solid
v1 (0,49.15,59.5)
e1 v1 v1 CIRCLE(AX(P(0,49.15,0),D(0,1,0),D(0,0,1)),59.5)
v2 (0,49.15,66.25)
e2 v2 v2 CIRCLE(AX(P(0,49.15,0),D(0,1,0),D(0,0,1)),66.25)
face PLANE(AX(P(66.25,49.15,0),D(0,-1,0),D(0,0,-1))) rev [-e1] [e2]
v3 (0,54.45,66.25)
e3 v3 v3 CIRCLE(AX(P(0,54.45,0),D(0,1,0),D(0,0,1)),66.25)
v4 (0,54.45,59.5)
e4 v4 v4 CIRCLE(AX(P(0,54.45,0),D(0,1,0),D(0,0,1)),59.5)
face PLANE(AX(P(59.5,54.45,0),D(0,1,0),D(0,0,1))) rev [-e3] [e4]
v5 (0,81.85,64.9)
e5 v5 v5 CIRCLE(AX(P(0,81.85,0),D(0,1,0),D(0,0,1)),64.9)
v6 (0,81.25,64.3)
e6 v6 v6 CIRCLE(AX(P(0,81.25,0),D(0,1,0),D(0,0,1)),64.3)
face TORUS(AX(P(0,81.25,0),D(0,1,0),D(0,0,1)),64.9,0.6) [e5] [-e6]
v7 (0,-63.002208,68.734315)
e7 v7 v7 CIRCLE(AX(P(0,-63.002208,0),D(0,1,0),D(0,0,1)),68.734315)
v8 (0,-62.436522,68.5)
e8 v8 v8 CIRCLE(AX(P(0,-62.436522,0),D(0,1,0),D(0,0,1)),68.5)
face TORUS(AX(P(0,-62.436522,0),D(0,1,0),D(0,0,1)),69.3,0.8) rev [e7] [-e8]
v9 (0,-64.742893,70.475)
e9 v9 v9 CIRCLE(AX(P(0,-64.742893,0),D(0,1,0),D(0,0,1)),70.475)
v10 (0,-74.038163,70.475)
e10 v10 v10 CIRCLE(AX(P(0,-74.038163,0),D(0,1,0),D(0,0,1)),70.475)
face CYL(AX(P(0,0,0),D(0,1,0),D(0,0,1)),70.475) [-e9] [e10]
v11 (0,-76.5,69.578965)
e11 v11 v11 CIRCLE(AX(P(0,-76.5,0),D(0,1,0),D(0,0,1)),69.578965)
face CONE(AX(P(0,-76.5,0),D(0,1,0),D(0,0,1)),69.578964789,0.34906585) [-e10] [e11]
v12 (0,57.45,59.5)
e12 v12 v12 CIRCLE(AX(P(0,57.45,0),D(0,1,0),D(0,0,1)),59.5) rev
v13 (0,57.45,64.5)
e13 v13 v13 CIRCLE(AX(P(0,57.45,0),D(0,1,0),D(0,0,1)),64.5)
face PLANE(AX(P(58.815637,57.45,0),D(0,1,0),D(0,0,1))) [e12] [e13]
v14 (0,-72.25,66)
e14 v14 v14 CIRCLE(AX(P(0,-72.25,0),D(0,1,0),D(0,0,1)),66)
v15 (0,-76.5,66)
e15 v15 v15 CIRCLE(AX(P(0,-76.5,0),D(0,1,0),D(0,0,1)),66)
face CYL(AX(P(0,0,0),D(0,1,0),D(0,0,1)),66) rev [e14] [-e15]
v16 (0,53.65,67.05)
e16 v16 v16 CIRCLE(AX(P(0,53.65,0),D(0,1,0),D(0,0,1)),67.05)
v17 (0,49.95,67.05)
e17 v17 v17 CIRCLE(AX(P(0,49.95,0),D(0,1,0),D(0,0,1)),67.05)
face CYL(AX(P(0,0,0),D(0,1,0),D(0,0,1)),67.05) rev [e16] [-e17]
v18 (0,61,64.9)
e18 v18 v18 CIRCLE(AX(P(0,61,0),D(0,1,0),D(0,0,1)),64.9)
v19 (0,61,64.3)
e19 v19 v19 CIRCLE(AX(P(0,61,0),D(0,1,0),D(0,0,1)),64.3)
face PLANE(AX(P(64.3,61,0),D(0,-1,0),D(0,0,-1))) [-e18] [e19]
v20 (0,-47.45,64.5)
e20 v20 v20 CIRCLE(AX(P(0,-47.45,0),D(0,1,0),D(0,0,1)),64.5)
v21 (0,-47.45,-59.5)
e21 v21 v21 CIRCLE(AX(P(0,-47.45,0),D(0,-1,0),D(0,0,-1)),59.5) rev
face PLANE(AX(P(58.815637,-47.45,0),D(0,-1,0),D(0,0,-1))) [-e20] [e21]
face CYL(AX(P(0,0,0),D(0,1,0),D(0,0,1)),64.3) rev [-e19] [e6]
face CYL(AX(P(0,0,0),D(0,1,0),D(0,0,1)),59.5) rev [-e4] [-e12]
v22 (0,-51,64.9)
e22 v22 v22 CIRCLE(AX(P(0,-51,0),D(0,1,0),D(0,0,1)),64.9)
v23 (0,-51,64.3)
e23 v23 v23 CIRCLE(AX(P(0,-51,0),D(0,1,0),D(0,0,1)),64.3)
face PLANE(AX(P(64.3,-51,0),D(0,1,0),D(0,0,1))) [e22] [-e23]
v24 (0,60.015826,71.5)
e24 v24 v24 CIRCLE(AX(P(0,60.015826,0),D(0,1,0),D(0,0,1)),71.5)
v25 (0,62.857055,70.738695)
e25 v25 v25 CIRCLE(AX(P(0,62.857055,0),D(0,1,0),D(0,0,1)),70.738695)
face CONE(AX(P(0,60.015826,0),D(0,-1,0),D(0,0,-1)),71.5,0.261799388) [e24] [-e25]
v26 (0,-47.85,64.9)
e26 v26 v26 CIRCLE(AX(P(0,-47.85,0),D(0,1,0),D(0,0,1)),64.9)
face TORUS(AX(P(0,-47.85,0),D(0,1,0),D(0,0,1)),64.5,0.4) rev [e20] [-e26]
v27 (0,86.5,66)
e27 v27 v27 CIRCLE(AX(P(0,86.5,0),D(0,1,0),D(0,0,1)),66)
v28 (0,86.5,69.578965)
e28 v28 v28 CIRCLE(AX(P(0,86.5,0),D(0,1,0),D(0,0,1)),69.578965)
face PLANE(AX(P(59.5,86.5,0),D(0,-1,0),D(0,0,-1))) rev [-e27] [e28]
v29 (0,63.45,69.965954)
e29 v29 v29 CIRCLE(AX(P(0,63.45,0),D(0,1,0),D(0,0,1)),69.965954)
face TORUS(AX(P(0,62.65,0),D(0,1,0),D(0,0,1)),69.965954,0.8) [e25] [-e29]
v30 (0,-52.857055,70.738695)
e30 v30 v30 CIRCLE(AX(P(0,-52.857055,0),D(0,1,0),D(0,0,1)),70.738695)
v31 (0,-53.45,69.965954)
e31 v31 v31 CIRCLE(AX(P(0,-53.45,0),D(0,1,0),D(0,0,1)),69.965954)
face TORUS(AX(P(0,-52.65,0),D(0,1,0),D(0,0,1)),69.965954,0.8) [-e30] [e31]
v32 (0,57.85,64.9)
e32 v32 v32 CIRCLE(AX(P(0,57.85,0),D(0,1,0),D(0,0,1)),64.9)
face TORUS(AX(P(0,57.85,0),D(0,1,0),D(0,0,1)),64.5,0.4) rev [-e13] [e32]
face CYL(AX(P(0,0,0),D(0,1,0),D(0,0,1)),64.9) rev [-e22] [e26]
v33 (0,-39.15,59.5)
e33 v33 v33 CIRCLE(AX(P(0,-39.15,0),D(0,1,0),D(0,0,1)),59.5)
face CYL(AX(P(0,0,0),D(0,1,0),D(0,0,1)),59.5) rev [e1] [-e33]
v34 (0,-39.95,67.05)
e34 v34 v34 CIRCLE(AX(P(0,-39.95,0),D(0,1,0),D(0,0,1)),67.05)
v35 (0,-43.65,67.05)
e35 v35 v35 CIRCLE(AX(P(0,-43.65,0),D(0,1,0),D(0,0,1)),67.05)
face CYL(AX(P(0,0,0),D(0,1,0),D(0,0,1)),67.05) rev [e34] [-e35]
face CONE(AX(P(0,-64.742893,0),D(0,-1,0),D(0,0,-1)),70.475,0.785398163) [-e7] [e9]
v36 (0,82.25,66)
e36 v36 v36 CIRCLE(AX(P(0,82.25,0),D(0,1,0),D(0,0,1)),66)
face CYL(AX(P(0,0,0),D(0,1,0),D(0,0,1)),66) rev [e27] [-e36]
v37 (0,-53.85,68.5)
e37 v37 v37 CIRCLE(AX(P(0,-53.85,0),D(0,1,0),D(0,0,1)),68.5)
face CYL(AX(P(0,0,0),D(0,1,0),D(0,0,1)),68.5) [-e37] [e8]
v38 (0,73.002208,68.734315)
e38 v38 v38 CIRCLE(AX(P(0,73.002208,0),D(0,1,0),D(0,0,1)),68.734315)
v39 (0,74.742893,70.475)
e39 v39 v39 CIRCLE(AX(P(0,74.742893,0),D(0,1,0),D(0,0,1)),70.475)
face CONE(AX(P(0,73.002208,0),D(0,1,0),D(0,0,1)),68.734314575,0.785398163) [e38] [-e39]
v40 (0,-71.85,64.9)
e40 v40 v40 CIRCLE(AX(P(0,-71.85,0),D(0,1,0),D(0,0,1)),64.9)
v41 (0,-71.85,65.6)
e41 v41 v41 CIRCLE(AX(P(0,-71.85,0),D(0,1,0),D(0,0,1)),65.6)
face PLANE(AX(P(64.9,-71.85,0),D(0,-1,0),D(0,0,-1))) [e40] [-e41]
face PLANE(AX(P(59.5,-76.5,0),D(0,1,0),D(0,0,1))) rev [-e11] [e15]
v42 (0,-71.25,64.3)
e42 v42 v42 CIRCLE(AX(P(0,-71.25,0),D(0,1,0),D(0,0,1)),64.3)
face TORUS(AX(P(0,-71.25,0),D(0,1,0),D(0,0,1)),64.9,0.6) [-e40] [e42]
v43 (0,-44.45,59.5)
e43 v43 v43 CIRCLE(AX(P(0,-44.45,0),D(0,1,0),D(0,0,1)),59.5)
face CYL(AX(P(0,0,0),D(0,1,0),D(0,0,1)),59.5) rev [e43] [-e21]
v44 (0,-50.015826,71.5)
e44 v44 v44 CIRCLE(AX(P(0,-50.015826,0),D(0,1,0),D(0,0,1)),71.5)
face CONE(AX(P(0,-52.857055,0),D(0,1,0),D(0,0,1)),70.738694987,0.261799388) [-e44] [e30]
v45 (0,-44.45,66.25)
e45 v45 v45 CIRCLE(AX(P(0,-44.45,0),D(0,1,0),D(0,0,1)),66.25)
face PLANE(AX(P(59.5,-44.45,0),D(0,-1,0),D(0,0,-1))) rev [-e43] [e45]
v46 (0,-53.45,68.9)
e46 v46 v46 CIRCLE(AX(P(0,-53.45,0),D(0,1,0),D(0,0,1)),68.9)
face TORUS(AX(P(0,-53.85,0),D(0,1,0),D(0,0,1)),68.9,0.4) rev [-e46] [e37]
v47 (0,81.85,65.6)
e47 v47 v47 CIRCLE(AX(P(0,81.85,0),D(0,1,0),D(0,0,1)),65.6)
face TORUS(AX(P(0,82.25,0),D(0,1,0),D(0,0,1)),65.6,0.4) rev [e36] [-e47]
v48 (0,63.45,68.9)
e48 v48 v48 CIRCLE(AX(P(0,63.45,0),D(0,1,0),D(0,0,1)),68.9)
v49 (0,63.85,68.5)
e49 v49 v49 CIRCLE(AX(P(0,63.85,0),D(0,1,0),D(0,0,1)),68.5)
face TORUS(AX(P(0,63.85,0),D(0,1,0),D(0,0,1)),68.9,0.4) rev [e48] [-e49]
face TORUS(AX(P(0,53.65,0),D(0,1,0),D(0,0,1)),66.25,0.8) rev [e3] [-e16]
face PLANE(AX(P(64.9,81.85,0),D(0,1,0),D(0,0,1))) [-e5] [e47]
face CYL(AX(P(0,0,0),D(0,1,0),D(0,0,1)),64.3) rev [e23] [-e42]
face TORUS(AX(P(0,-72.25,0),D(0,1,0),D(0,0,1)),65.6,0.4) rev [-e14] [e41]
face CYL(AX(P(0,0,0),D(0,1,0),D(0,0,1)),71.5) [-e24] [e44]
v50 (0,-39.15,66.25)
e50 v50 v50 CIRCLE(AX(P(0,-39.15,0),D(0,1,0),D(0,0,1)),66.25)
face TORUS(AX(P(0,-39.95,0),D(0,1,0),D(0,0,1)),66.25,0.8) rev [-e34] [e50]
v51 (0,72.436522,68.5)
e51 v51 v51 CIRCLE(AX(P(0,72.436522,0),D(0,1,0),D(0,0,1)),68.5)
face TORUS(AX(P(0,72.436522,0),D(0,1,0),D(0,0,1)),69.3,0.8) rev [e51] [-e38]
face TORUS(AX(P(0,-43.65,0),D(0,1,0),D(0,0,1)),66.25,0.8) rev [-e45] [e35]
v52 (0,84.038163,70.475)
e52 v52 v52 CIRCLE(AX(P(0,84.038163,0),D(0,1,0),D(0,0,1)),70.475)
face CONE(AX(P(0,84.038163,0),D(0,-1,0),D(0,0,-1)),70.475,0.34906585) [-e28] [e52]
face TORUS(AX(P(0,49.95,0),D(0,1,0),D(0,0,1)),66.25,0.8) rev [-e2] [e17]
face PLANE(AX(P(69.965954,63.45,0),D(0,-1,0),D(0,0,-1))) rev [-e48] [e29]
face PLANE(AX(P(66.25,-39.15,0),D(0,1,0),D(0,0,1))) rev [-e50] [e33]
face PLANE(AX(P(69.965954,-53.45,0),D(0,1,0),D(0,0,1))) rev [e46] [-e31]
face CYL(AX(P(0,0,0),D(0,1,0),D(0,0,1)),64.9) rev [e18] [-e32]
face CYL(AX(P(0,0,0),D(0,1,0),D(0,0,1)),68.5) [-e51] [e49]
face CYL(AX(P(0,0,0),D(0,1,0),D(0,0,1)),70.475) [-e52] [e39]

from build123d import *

# Parameters (mm, degrees)
SKETCH3_R           = 1.5
CUT_EXTRUDE2_DEPTH  = 126.898381754
EXTRUDE1_DEPTH      = 126.898381754
EXTRUDE1_DEPTH_BACK = 126.898381754
SKETCH8_R           = 6


with BuildPart() as part:
    # Sketch1 → Revolve1 (revolve)
    with BuildSketch(Plane.XY):
        with BuildLine():
            Line((69.660254038, 0), (62.5, 0))
            Line((62.5, 0), (61, -1.5))
            Line((61, -1.5), (61, -34))
            Line((61, -34), (60.265192379, -35.272724134))
            ThreePointArc((60.265192379, -35.272724134), (60.235222252, -35.34507842), (60.225, -35.422724134))
            Line((60.225, -35.422724134), (60.225, -38.35))
            ThreePointArc((60.225, -38.35), (60.312867966, -38.562132034), (60.525, -38.65))
            Line((60.525, -38.65), (67.15, -38.65))
            ThreePointArc((67.15, -38.65), (67.432842712, -38.767157288), (67.55, -39.05))
            Line((67.55, -39.05), (67.55, -44.55))
            ThreePointArc((67.55, -44.55), (67.432842712, -44.832842712), (67.15, -44.95))
            Line((67.15, -44.95), (60.315, -44.95))
            ThreePointArc((60.315, -44.95), (60.102867966, -45.037867966), (60.015, -45.25))
            Line((60.015, -45.25), (60.015, -47.45))
            Line((60.015, -47.45), (60.015, -51.708380151))
            ThreePointArc((60.015, -51.708380151), (60.515, -52.45), (60.015, -53.191619849))
            Line((60.015, -53.191619849), (60.015, -59.708380151))
            ThreePointArc((60.015, -59.708380151), (60.515, -60.45), (60.015, -61.191619849))
            Line((60.015, -61.191619849), (60.015, -75.7))
            Line((60.015, -75.7), (60.265, -75.95))
            Line((60.265, -75.95), (68.896955762, -75.95))
            ThreePointArc((68.896955762, -75.95), (69.183743981, -75.859576022), (69.366802073, -75.621010072))
            Line((69.366802073, -75.621010072), (69.975, -73.95))
            Line((69.975, -73.95), (69.975, -71.4))
            ThreePointArc((69.975, -71.4), (69.901776695, -71.223223305), (69.725, -71.15))
            Line((69.725, -71.15), (67.9, -71.15))
            ThreePointArc((67.9, -71.15), (67.617157288, -71.032842712), (67.5, -70.75))
            Line((67.5, -70.75), (67.5, -67.75))
            ThreePointArc((67.5, -67.75), (67.617157288, -67.467157288), (67.9, -67.35))
            Line((67.9, -67.35), (69.725, -67.35))
            ThreePointArc((69.725, -67.35), (69.901776695, -67.276776695), (69.975, -67.1))
            Line((69.975, -67.1), (69.975, -64.95))
            Line((69.975, -64.95), (68.234314575, -63.209314575))
            ThreePointArc((68.234314575, -63.209314575), (68.060896374, -62.949775896), (68, -62.64362915))
            Line((68, -62.64362915), (68, -53.75))
            ThreePointArc((68, -53.75), (68.234314575, -53.184314575), (68.8, -52.95))
            Line((68.8, -52.95), (69.965954326, -52.95))
            ThreePointArc((69.965954326, -52.95), (70.148582755, -52.888006002), (70.255732074, -52.727645714))
            Line((70.255732074, -52.727645714), (71, -49.95))
            Line((71, -49.95), (71, -32.05))
            ThreePointArc((71, -32.05), (70.912132034, -31.837867966), (70.7, -31.75))
            Line((70.7, -31.75), (68.9, -31.75))
            ThreePointArc((68.9, -31.75), (68.617157288, -31.632842712), (68.5, -31.35))
            Line((68.5, -31.35), (68.5, -28.35))
            ThreePointArc((68.5, -28.35), (68.617157288, -28.067157288), (68.9, -27.95))
            Line((68.9, -27.95), (70.7, -27.95))
            ThreePointArc((70.7, -27.95), (70.912132034, -27.862132034), (71, -27.65))
            Line((71, -27.65), (71, -24.429919354))
            ThreePointArc((71, -24.429919354), (70.95669604, -24.274654603), (70.839285714, -24.164213709))
            ThreePointArc((70.839285714, -24.164213709), (69.5, -21.95), (70.839285714, -19.735786291))
            ThreePointArc((70.839285714, -19.735786291), (70.95669604, -19.625345397), (71, -19.470080646))
            Line((71, -19.470080646), (71, -14.05))
            ThreePointArc((71, -14.05), (70.912132034, -13.837867966), (70.7, -13.75))
            Line((70.7, -13.75), (68.9, -13.75))
            ThreePointArc((68.9, -13.75), (68.617157288, -13.632842712), (68.5, -13.35))
            Line((68.5, -13.35), (68.5, -10.35))
            ThreePointArc((68.5, -10.35), (68.617157288, -10.067157288), (68.9, -9.95))
            Line((68.9, -9.95), (70.7, -9.95))
            ThreePointArc((70.7, -9.95), (70.912132034, -9.862132034), (71, -9.65))
            Line((71, -9.65), (71, -5))
            Line((71, -5), (69.660254038, 0))
        make_face()
    revolve(axis=Axis((0, 0, 0), (0, -1, 0)))

    # Sketch3 → Cut-Extrude2 (cut, through all)
    with BuildSketch(Plane.XY):
        with Locations((0, -21.95)):
            Circle(SKETCH3_R)
    extrude(amount=CUT_EXTRUDE2_DEPTH, mode=Mode.SUBTRACT)

    # Sketch8 → Extrude1 (cut, two sides: drawn at the far end of the back side and taken through both)
    with BuildSketch(Plane.XY.offset(-EXTRUDE1_DEPTH_BACK)):
        with Locations((0, 4.5)):
            Circle(SKETCH8_R)
    extrude(amount=EXTRUDE1_DEPTH + EXTRUDE1_DEPTH_BACK, mode=Mode.SUBTRACT)

    # Sketch13 → Revolve2 (revolve)
    with BuildSketch(Plane.XY):
        with BuildLine():
            Line((59.5, -47.45), (59.5, -76.5))
            Line((59.5, -76.5), (69.578964789, -76.5))
            Line((69.578964789, -76.5), (70.475, -74.03816349))
            Line((70.475, -74.03816349), (70.475, -66.7))
            Line((70.475, -66.7), (70.475, -64.742893219))
            Line((70.475, -64.742893219), (68.734314575, -63.002207794))
            ThreePointArc((68.734314575, -63.002207794), (68.560896374, -62.742669115), (68.5, -62.436522369))
            Line((68.5, -62.436522369), (68.5, -53.85))
            ThreePointArc((68.5, -53.85), (68.617157288, -53.567157288), (68.9, -53.45))
            Line((68.9, -53.45), (69.965954326, -53.45))
            ThreePointArc((69.965954326, -53.45), (70.45296347, -53.284682672), (70.738694987, -52.857055236))
            Line((70.738694987, -52.857055236), (71.5, -50.015826249))
            Line((71.5, -50.015826249), (71.5, 0))
            Line((71.5, 0), (71.5, 60.015826249))
            Line((71.5, 60.015826249), (70.738694987, 62.857055236))
            ThreePointArc((70.738694987, 62.857055236), (70.45296347, 63.284682672), (69.965954326, 63.45))
            Line((69.965954326, 63.45), (68.9, 63.45))
            ThreePointArc((68.9, 63.45), (68.617157288, 63.567157288), (68.5, 63.85))
            Line((68.5, 63.85), (68.5, 72.436522369))
            ThreePointArc((68.5, 72.436522369), (68.560896374, 72.742669115), (68.734314575, 73.002207794))
            Line((68.734314575, 73.002207794), (70.475, 74.742893219))
            Line((70.475, 74.742893219), (70.475, 76.7))
            Line((70.475, 76.7), (70.475, 84.03816349))
            Line((70.475, 84.03816349), (69.578964789, 86.5))
            Line((69.578964789, 86.5), (59.5, 86.5))
            Line((59.5, 86.5), (59.5, 54.45))
            Line((59.5, 54.45), (66.25, 54.45))
            ThreePointArc((66.25, 54.45), (66.815685425, 54.215685425), (67.05, 53.65))
            Line((67.05, 53.65), (67.05, 49.95))
            ThreePointArc((67.05, 49.95), (66.815685425, 49.384314575), (66.25, 49.15))
            Line((66.25, 49.15), (59.5, 49.15))
            Line((59.5, 49.15), (59.5, -39.15))
            Line((59.5, -39.15), (66.25, -39.15))
            ThreePointArc((66.25, -39.15), (66.815685425, -39.384314575), (67.05, -39.95))
            Line((67.05, -39.95), (67.05, -43.65))
            ThreePointArc((67.05, -43.65), (66.815685425, -44.215685425), (66.25, -44.45))
            Line((66.25, -44.45), (59.5, -44.45))
            Line((59.5, -44.45), (59.5, -47.45))
        make_face()
    revolve(axis=Axis((0, 0, 0), (0, -1, 0)))

    # Sketch14 → Cut-Revolve1 (revolve, cut)
    with BuildSketch(Plane.XY):
        with BuildLine():
            Line((64.9, -71.85), (65.6, -71.85))
            ThreePointArc((65.6, -71.85), (65.882842712, -71.967157288), (66, -72.25))
            Line((66, -72.25), (66, -76.5))
            Line((66, -76.5), (58.8156371, -76.5))
            Line((58.8156371, -76.5), (58.8156371, -47.45))
            Line((58.8156371, -47.45), (64.5, -47.45))
            ThreePointArc((64.5, -47.45), (64.782842712, -47.567157288), (64.9, -47.85))
            Line((64.9, -47.85), (64.9, -51))
            Line((64.9, -51), (64.3, -51))
            Line((64.3, -51), (64.3, -60.95))
            Line((64.3, -60.95), (64.3, -64.5))
            Line((64.3, -64.5), (64.3, -71.25))
            ThreePointArc((64.3, -71.25), (64.475735931, -71.674264069), (64.9, -71.85))
        make_face()
        with BuildLine():
            Line((64.9, 61), (64.9, 57.85))
            ThreePointArc((64.9, 57.85), (64.782842712, 57.567157288), (64.5, 57.45))
            Line((64.5, 57.45), (58.8156371, 57.45))
            Line((58.8156371, 57.45), (58.8156371, 86.5))
            Line((58.8156371, 86.5), (66, 86.5))
            Line((66, 86.5), (66, 82.25))
            ThreePointArc((66, 82.25), (65.882842712, 81.967157288), (65.6, 81.85))
            Line((65.6, 81.85), (64.9, 81.85))
            ThreePointArc((64.9, 81.85), (64.475735931, 81.674264069), (64.3, 81.25))
            Line((64.3, 81.25), (64.3, 74.5))
            Line((64.3, 74.5), (64.3, 70.95))
            Line((64.3, 70.95), (64.3, 61))
            Line((64.3, 61), (64.9, 61))
        make_face()
    revolve(axis=Axis((0, 0, 0), (0, -1, 0)), mode=Mode.SUBTRACT)


solid = part.part
